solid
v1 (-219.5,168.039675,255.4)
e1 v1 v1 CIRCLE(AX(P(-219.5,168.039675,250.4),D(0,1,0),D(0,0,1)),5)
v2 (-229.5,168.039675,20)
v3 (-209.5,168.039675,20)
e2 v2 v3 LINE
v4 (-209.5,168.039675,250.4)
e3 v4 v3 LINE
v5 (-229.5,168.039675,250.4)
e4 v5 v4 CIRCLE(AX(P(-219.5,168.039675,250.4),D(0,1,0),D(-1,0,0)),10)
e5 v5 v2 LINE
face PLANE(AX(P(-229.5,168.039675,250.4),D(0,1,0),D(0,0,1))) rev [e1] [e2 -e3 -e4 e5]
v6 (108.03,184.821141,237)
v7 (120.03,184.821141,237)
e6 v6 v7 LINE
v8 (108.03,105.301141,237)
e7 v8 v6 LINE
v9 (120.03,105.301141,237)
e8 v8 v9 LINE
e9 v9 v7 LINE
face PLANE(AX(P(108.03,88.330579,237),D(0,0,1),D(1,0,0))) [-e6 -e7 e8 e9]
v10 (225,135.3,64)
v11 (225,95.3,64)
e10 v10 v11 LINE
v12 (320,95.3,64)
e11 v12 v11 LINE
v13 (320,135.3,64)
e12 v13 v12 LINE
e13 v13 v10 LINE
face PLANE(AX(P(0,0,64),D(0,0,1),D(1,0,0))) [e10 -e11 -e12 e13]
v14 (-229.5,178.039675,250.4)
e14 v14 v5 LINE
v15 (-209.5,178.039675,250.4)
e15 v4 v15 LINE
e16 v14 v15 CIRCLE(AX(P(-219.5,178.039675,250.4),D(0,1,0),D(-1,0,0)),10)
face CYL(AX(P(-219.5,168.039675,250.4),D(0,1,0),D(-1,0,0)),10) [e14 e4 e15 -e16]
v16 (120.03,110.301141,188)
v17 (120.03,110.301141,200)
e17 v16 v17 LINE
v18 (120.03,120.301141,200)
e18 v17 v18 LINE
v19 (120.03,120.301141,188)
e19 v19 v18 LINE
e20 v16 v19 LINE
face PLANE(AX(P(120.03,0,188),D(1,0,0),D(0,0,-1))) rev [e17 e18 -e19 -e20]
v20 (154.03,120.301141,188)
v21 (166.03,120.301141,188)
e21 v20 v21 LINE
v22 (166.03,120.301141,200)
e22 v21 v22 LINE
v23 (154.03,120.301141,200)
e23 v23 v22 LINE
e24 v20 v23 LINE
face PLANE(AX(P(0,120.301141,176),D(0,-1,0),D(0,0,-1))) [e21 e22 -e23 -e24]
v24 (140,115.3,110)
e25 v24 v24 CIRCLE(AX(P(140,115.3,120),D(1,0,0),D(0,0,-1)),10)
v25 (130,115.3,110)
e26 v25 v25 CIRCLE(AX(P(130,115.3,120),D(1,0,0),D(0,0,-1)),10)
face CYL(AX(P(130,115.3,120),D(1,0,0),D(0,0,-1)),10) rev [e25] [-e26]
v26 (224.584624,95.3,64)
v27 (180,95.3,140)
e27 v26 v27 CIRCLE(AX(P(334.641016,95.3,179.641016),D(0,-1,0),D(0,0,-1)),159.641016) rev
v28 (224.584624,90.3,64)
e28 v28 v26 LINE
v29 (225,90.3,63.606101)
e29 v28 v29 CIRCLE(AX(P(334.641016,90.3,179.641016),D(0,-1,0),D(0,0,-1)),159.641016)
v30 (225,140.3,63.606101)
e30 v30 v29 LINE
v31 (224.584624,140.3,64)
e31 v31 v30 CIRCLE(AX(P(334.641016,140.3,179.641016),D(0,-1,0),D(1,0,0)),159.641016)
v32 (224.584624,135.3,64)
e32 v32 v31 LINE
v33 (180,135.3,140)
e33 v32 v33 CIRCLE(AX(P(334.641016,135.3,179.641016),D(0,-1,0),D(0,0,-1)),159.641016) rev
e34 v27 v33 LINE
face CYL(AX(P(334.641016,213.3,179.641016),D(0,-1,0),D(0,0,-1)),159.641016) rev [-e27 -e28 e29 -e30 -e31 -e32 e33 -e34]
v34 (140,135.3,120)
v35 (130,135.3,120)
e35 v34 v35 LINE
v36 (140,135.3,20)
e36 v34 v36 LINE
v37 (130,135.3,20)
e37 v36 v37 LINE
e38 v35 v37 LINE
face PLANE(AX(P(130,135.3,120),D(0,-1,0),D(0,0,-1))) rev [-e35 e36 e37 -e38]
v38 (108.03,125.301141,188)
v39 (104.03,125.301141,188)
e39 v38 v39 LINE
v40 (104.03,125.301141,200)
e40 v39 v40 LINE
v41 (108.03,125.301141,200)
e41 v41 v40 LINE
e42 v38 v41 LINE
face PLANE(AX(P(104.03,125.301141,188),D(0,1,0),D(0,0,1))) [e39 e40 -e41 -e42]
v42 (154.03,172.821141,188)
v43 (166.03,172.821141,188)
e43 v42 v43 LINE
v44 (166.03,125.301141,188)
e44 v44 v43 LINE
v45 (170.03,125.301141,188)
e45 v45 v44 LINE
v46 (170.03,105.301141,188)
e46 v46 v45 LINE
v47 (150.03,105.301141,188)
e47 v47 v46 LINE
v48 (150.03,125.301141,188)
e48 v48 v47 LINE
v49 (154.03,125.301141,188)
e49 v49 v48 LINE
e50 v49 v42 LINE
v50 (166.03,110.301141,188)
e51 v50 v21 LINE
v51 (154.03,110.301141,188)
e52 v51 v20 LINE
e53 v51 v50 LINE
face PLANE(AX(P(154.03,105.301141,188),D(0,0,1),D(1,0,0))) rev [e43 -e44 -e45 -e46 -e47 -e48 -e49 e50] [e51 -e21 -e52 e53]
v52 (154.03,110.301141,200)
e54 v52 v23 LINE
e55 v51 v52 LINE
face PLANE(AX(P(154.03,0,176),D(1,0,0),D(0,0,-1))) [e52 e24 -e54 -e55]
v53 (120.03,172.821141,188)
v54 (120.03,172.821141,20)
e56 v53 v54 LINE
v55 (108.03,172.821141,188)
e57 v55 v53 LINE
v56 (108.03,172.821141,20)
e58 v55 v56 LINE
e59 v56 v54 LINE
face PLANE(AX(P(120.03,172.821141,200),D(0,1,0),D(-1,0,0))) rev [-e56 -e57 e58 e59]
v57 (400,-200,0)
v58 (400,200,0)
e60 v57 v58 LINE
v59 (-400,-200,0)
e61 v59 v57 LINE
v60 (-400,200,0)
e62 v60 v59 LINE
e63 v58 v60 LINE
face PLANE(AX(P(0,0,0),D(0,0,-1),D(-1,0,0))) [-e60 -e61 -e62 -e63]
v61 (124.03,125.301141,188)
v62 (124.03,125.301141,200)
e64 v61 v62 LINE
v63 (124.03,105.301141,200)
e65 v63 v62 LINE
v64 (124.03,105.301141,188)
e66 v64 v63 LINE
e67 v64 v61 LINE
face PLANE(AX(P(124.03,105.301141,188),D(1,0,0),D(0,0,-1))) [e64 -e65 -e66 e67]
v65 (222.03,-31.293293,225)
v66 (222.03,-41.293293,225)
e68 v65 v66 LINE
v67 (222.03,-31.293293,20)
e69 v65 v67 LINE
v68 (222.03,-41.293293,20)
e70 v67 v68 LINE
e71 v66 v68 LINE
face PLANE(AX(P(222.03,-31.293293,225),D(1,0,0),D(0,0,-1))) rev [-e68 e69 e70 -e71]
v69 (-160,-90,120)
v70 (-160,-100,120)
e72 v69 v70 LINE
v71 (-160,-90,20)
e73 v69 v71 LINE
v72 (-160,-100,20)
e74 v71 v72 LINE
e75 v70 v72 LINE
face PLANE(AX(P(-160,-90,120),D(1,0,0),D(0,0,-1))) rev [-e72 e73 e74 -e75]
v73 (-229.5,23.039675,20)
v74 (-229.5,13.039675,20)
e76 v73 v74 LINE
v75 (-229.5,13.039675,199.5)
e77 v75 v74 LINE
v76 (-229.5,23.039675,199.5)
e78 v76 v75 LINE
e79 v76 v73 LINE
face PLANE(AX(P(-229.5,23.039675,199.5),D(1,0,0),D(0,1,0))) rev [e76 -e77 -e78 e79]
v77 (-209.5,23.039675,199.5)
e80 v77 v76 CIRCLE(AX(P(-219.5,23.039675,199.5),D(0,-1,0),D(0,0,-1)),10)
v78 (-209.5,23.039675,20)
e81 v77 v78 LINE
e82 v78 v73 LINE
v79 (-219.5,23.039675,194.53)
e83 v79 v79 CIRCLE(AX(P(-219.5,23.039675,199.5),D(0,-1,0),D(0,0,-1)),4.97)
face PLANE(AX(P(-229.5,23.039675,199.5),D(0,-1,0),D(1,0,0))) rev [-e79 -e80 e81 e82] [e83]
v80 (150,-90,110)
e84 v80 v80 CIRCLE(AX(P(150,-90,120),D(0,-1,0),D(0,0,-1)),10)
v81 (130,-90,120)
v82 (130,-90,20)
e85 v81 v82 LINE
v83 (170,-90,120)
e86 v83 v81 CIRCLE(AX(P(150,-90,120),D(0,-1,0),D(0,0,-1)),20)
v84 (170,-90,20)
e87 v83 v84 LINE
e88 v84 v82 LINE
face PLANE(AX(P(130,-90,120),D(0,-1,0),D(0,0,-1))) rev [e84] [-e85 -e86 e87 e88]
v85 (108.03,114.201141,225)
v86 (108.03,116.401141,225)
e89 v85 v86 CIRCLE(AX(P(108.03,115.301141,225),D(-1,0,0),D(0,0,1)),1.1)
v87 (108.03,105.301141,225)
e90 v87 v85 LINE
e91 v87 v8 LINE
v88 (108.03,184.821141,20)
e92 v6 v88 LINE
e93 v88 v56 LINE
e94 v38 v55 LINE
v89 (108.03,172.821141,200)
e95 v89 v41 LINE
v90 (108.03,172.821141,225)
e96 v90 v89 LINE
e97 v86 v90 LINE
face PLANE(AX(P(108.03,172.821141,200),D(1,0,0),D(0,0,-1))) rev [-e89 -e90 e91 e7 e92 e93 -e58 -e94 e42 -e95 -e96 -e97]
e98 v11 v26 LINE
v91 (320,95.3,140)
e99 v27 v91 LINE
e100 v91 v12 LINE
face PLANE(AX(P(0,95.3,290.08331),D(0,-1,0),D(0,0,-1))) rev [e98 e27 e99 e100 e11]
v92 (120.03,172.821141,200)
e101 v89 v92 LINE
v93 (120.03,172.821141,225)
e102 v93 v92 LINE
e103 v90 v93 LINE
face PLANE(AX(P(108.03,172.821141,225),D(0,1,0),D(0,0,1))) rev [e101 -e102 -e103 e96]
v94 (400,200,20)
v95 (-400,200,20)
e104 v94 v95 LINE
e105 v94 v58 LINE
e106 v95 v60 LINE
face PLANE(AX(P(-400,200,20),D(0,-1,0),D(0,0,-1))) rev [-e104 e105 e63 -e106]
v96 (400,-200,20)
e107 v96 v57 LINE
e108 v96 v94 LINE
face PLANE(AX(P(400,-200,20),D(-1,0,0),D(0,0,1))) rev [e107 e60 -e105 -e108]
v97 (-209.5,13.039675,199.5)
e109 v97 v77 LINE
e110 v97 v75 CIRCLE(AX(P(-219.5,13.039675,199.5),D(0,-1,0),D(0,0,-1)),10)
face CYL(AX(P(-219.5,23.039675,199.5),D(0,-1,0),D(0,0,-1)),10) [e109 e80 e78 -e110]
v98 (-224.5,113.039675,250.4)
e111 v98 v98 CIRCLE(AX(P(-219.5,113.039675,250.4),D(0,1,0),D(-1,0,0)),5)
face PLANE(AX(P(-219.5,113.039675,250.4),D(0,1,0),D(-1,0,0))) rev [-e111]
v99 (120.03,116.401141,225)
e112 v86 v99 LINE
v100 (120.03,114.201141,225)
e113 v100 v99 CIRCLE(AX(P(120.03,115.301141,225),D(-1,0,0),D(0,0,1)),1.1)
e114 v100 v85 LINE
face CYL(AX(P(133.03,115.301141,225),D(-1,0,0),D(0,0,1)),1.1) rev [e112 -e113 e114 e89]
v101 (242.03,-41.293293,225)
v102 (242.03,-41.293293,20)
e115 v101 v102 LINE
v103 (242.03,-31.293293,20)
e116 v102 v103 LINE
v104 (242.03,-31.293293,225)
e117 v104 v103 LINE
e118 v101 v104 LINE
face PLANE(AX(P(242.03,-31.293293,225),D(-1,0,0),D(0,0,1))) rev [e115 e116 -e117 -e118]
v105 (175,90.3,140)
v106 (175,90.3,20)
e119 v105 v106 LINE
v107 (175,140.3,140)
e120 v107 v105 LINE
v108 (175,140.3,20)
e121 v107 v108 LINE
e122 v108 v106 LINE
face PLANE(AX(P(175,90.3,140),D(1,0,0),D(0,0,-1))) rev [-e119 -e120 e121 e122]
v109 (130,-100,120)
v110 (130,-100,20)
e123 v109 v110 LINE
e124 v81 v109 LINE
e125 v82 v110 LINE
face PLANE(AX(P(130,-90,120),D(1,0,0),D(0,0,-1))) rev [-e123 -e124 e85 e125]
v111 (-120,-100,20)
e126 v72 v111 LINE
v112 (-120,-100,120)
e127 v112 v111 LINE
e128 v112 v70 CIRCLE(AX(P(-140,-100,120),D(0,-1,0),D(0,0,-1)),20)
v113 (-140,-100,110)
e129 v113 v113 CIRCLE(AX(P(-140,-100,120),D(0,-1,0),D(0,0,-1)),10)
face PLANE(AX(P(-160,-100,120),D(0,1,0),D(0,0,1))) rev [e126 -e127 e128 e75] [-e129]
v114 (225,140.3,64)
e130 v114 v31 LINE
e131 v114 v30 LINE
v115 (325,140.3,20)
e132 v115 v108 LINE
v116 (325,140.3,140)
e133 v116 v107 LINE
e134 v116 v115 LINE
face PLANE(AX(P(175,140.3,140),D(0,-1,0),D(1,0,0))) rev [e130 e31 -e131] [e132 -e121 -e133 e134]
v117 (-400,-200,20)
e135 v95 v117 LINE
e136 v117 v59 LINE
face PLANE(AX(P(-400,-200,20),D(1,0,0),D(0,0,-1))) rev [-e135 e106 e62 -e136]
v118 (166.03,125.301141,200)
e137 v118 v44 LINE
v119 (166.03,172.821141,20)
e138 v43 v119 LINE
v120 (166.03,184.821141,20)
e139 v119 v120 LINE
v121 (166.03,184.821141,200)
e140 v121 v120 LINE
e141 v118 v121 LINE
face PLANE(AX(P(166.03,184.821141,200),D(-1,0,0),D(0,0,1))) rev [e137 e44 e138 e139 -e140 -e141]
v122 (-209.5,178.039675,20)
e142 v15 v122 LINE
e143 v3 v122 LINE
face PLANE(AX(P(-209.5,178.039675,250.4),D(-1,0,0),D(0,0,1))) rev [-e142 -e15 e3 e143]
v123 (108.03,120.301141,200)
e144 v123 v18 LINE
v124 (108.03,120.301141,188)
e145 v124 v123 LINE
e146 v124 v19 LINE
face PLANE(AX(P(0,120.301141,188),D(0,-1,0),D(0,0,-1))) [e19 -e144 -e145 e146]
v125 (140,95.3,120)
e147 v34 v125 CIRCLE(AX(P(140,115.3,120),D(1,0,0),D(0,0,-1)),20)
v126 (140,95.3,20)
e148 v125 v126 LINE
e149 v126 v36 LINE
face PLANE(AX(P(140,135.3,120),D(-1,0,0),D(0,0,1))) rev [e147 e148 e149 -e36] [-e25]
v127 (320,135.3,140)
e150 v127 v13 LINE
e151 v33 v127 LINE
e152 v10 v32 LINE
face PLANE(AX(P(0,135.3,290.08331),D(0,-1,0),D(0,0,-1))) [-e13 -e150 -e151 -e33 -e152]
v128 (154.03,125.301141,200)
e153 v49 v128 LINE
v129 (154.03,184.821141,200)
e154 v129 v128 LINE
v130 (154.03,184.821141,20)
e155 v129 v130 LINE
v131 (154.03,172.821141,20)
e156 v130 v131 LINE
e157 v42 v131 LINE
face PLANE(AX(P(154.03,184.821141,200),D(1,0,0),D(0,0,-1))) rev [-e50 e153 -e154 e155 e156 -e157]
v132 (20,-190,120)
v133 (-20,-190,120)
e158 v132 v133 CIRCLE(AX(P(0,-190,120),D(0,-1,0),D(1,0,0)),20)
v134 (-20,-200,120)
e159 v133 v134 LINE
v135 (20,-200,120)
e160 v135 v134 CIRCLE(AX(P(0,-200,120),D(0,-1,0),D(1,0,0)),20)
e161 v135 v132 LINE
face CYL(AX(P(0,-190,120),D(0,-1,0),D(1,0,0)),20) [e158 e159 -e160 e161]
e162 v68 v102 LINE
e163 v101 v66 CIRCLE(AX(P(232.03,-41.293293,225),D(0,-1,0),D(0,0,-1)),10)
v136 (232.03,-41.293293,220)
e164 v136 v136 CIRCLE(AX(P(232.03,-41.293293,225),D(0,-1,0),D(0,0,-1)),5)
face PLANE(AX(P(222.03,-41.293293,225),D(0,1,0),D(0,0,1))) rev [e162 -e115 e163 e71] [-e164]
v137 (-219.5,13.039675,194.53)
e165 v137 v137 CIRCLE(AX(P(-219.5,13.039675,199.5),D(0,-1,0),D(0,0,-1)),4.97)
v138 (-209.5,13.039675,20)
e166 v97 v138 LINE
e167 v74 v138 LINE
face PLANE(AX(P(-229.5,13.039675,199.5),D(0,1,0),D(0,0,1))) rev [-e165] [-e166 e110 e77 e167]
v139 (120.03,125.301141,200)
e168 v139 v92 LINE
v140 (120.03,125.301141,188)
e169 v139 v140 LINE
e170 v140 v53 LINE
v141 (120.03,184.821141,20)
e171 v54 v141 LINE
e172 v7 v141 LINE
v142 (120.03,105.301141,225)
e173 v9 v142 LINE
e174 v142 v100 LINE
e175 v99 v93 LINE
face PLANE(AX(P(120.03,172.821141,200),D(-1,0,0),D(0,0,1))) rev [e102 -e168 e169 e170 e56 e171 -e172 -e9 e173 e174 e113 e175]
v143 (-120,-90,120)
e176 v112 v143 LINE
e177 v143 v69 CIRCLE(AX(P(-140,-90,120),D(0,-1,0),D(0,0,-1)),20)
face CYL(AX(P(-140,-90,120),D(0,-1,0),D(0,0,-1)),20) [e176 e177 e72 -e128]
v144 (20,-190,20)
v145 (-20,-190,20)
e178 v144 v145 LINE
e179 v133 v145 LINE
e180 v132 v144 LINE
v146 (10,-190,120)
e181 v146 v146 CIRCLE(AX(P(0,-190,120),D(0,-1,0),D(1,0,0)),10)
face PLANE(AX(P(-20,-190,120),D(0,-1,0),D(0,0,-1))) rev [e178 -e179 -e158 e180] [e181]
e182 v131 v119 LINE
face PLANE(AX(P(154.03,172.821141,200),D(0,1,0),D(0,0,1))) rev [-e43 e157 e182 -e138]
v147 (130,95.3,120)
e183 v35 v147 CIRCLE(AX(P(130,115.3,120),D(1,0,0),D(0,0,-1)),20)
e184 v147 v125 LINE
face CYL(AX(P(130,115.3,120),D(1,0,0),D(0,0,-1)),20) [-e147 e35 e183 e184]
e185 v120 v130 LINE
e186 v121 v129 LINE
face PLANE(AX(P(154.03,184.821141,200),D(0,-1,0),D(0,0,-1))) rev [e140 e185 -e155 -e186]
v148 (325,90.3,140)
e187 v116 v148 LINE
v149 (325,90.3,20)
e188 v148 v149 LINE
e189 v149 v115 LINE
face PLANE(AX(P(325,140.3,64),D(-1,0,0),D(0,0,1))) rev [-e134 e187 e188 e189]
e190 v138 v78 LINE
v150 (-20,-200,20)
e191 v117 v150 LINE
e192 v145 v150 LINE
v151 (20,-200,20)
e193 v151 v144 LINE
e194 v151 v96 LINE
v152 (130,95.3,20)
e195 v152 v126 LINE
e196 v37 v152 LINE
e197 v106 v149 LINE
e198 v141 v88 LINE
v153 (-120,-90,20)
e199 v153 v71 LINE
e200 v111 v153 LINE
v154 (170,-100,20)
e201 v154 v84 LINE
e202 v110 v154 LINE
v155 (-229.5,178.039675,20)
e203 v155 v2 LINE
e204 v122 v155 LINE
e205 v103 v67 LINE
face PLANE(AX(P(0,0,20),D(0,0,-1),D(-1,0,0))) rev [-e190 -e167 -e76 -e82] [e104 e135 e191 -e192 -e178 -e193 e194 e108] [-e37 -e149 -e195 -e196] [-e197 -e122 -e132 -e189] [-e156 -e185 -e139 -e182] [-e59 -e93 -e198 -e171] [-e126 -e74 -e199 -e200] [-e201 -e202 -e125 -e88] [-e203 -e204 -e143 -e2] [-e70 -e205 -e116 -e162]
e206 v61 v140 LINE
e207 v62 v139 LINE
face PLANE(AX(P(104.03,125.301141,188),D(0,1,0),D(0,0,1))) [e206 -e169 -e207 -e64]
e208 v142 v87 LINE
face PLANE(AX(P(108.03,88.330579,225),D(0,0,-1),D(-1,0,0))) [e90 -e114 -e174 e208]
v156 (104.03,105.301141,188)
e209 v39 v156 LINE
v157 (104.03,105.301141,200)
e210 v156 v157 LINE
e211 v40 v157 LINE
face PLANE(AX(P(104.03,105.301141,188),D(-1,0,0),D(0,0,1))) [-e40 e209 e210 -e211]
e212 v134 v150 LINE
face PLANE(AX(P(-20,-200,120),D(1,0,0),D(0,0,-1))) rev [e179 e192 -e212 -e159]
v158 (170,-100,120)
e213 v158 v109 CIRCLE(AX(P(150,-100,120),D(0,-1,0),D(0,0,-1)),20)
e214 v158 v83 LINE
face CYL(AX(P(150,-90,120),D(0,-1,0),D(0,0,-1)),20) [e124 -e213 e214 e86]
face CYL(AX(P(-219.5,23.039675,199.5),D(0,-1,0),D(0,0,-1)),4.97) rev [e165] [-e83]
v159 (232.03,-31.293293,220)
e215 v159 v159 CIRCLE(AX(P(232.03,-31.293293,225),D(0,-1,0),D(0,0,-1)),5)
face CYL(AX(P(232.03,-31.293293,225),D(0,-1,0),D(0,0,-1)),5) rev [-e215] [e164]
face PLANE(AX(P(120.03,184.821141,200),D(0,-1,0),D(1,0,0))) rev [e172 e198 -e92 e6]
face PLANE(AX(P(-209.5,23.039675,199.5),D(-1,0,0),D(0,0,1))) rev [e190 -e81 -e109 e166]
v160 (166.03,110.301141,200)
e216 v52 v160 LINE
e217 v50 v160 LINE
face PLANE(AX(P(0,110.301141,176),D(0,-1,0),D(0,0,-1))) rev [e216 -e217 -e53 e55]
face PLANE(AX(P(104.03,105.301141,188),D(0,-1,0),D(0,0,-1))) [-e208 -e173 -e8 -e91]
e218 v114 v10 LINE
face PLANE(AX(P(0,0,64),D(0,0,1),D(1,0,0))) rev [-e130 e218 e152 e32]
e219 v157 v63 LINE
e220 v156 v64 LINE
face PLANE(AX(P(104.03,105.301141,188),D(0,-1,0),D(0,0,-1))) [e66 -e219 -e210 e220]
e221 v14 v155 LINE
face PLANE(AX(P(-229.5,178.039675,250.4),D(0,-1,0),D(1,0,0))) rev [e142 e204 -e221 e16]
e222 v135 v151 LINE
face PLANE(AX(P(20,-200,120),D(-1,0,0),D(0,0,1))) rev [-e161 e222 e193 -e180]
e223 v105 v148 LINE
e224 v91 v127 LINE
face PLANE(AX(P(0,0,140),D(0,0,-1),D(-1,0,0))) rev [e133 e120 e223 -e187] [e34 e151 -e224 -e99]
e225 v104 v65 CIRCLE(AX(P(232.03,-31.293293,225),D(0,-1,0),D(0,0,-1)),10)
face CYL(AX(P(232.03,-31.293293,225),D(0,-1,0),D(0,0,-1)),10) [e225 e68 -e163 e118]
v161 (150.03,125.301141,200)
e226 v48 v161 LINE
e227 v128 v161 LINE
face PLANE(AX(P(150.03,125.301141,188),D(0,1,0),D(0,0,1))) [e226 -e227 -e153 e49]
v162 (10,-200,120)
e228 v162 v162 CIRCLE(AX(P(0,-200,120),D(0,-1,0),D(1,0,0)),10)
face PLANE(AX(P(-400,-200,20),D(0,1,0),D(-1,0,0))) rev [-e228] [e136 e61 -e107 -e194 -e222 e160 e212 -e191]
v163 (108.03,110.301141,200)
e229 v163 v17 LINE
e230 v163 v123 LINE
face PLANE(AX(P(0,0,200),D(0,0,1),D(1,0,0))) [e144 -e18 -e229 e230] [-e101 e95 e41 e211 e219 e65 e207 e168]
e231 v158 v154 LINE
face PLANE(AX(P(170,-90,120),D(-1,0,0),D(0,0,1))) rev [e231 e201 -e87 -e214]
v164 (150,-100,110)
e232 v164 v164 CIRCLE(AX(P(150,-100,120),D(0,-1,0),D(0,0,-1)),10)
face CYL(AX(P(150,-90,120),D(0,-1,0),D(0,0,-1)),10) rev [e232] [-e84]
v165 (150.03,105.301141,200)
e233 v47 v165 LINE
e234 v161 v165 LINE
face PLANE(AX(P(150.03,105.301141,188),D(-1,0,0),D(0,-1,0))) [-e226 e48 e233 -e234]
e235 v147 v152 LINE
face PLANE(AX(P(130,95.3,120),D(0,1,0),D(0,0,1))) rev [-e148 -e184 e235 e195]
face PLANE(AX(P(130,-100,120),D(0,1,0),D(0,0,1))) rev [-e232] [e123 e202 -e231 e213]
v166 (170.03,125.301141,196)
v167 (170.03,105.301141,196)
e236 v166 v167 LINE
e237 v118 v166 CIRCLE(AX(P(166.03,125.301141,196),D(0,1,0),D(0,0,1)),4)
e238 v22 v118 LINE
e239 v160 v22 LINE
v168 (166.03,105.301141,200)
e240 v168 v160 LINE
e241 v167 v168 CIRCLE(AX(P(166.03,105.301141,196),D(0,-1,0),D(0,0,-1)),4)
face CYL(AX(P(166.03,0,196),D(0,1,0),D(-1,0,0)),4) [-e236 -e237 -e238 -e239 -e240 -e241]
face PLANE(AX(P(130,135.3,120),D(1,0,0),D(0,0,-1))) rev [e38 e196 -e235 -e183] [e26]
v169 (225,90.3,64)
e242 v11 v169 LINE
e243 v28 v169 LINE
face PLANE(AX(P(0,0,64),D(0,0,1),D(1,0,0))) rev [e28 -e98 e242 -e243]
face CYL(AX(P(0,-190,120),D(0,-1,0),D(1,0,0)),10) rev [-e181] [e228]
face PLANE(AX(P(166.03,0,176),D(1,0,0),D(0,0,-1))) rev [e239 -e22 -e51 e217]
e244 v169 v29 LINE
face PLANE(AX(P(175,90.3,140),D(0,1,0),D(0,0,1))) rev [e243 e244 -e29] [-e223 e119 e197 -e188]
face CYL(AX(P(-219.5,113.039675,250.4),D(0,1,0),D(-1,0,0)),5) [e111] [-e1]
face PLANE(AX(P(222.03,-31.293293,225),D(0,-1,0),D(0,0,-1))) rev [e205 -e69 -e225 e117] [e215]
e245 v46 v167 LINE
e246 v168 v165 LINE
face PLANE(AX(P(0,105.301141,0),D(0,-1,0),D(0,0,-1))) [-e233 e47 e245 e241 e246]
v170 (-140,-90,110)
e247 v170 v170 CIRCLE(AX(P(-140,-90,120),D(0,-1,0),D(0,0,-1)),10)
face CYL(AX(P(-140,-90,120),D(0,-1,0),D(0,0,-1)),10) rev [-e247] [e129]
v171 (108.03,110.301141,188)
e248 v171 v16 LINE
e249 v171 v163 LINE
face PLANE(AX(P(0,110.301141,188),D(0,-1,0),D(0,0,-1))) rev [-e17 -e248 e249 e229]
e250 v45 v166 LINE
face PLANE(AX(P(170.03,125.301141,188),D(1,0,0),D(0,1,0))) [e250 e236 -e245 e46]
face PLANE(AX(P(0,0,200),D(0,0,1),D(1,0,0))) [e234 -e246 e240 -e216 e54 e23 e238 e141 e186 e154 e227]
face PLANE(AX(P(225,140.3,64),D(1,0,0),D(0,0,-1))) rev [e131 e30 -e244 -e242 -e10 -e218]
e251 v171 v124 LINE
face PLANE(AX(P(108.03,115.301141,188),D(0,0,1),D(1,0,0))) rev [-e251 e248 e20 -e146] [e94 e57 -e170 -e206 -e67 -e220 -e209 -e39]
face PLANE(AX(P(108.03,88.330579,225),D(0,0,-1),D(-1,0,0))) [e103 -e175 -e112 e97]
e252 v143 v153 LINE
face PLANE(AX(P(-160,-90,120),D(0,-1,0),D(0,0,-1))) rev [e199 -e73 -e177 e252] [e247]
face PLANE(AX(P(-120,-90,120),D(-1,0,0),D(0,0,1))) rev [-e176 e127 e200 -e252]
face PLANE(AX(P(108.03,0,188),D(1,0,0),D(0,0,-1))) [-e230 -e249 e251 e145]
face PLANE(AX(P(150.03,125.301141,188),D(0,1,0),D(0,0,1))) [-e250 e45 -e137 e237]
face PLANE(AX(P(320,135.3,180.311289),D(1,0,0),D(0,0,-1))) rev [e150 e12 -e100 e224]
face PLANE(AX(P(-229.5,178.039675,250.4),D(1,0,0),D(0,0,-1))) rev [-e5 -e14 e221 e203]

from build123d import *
from build123d.topology import SkipClean

# Parameters (mm, degrees)
SKETCH_1_W           = 800
SKETCH_1_H           = 400
EXTRUDE_1_DEPTH      = 20
SKETCH_2_W           = 40
SKETCH_2_H           = 10
EXTRUDE_2_DEPTH      = 100
SKETCH_3_R           = 20
EXTRUDE_3_DEPTH      = 10
SKETCH_4_R           = 10
CUT_EXTRUDE_1_DEPTH  = 10
SKETCH_5_W           = 40
SKETCH_5_H           = 10
EXTRUDE_4_DEPTH      = 100
SKETCH_6_R           = 20
SKETCH_6_R_2         = 10
EXTRUDE_5_DEPTH      = 10
SKETCH_8_R           = 10
CUT_EXTRUDE_2_DEPTH  = 10
SKETCH_9_W           = 10
SKETCH_9_H           = 40
EXTRUDE_6_DEPTH      = 100
SKETCH_10_R          = 20
EXTRUDE_7_DEPTH      = 10
SKETCH_11_R          = 10
CUT_EXTRUDE_3_DEPTH  = 10
SKETCH_12_W          = 40
SKETCH_12_H          = 10
EXTRUDE_8_DEPTH      = 100
SKETCH_13_R          = 20
EXTRUDE_9_DEPTH      = 10
SKETCH_14_R          = 10
CUT_EXTRUDE_4_DEPTH  = 10
SKETCH_15_W          = 20
SKETCH_15_H          = 10
EXTRUDE_10_DEPTH     = 179.5
SKETCH_16_R          = 10
EXTRUDE_11_DEPTH     = 10
SKETCH_17_R          = 4.97
CUT_EXTRUDE_5_DEPTH  = 10
SKETCH_18_W          = 12
SKETCH_18_H          = 12
EXTRUDE_12_DEPTH     = 180
SKETCH_19_W          = 12
SKETCH_19_H          = 12
EXTRUDE_13_DEPTH     = 57.52
SKETCH_20_W          = 20
SKETCH_20_H          = 20
EXTRUDE_14_DEPTH     = 12
SKETCH_21_W          = 6
SKETCH_21_H          = 5
CUT_EXTRUDE_6_DEPTH  = 12
SKETCH_23_W          = 12
SKETCH_23_H          = 12
EXTRUDE_15_DEPTH     = 180
SKETCH_24_W          = 12
SKETCH_24_H          = 12
EXTRUDE_16_DEPTH     = 67.52
EXTRUDE_17_DEPTH     = 12
SKETCH_26_W          = 6
SKETCH_26_H          = 5
CUT_EXTRUDE_7_DEPTH  = 24
SKETCH_27_W          = 12
SKETCH_27_H          = 12
EXTRUDE_18_DEPTH     = 25
SKETCH_28_W          = 12
SKETCH_28_H          = 12
EXTRUDE_19_DEPTH     = 79.52
SKETCH_29_R          = 1.1
CUT_EXTRUDE_8_DEPTH  = 25
SKETCH_30_W          = 20
SKETCH_30_H          = 10
EXTRUDE_20_DEPTH     = 205
SKETCH_31_R          = 10
EXTRUDE_21_DEPTH     = 10
SKETCH_32_R          = 5
CUT_EXTRUDE_9_DEPTH  = 10
FILLET_1_R           = 4
SKETCH_34_W          = 50
SKETCH_34_H          = 50
SKETCH_34_W_2        = 40
SKETCH_34_H_2        = 40
EXTRUDE_22_DEPTH     = 120
CUT_EXTRUDE_11_DEPTH = 123
SKETCH_36_W          = 100
SKETCH_36_H          = 50
EXTRUDE_23_DEPTH     = 44
SKETCH_38_W          = 40
SKETCH_38_H          = 40
EXTRUDE_24_DEPTH     = 120
CUT_EXTRUDE_12_DEPTH = 138
SKETCH_40_W          = 50
SKETCH_40_H          = 5
EXTRUDE_26_DEPTH     = 76
SKETCH_41_W          = 5
SKETCH_41_H          = 40
EXTRUDE_27_DEPTH     = 76
SKETCH_42_W          = 20
SKETCH_42_H          = 10
EXTRUDE_28_DEPTH     = 230.4
SKETCH_43_R          = 10
EXTRUDE_29_DEPTH     = 10
SKETCH_44_R          = 5
EXTRUDE_30_DEPTH     = 65


with BuildPart() as part:
    # 草图1 → 凸台-拉伸1 (new body)
    with BuildSketch(Plane.XY):
        Rectangle(SKETCH_1_W, SKETCH_1_H)
    extrude(amount=EXTRUDE_1_DEPTH)

    # 草图2 → 凸台-拉伸2 (add)
    with BuildSketch(Plane.XY.offset(20)):
        with Locations((0, -195)):
            Rectangle(SKETCH_2_W, SKETCH_2_H)
    extrude(amount=EXTRUDE_2_DEPTH)

    # 草图3 → 凸台-拉伸3 (add)
    with BuildSketch(Plane.XZ.offset(200)):
        with Locations((0, 120)):
            Circle(SKETCH_3_R)
    extrude(amount=-EXTRUDE_3_DEPTH)

    # 草图4 → 切除-拉伸1 (cut)
    with BuildSketch(Plane.XZ.offset(200)):
        with Locations((0, 120)):
            Circle(SKETCH_4_R)
    extrude(amount=-CUT_EXTRUDE_1_DEPTH, mode=Mode.SUBTRACT)

    # 草图5 → 凸台-拉伸4 (add)
    with BuildSketch(Plane.XY.offset(20)):
        with Locations((150, -95)):
            Rectangle(SKETCH_5_W, SKETCH_5_H)
    extrude(amount=EXTRUDE_4_DEPTH)

    # 草图6 → 凸台-拉伸5 (add)
    with BuildSketch(Plane.XZ.offset(100)):
        with Locations((150, 120)):
            Circle(SKETCH_6_R)
        with Locations((150, 120)):
            Circle(SKETCH_6_R_2, mode=Mode.SUBTRACT)
    extrude(amount=-EXTRUDE_5_DEPTH)

    # 草图8 → 切除-拉伸2 (cut)
    with BuildSketch(Plane.XZ.offset(100)):
        with Locations(Location((150, 120, 0), (0, 0, 270))):
            Circle(SKETCH_8_R)
    extrude(amount=-CUT_EXTRUDE_2_DEPTH, mode=Mode.SUBTRACT)

    # 草图9 → 凸台-拉伸6 (add)
    with BuildSketch(Plane.XY.offset(20)):
        with Locations((135, 115.3)):
            Rectangle(SKETCH_9_W, SKETCH_9_H)
    extrude(amount=EXTRUDE_6_DEPTH)

    # 草图10 → 凸台-拉伸7 (add)
    with BuildSketch(Plane(origin=(140, 0, 0), x_dir=(0, 0, -1), z_dir=(1, 0, 0))):
        with Locations((-120, 115.3)):
            Circle(SKETCH_10_R)
    extrude(amount=-EXTRUDE_7_DEPTH)

    # 草图11 → 切除-拉伸3 (cut)
    with BuildSketch(Plane(origin=(140, 0, 0), x_dir=(0, 0, -1), z_dir=(1, 0, 0))):
        with Locations((-120, 115.3)):
            Circle(SKETCH_11_R)
    extrude(amount=-CUT_EXTRUDE_3_DEPTH, mode=Mode.SUBTRACT)

    # 草图12 → 凸台-拉伸8 (add)
    with BuildSketch(Plane.XY.offset(20)):
        with Locations((-140, -95)):
            Rectangle(SKETCH_12_W, SKETCH_12_H)
    extrude(amount=EXTRUDE_8_DEPTH)

    # 草图13 → 凸台-拉伸9 (add)
    with BuildSketch(Plane.XZ.offset(100)):
        with Locations((-140, 120)):
            Circle(SKETCH_13_R)
    extrude(amount=-EXTRUDE_9_DEPTH)

    # 草图14 → 切除-拉伸4 (cut)
    with BuildSketch(Plane.XZ.offset(100)):
        with Locations(Location((-140, 120, 0), (0, 0, 270))):
            Circle(SKETCH_14_R)
    extrude(amount=-CUT_EXTRUDE_4_DEPTH, mode=Mode.SUBTRACT)

    # 草图15 → 凸台-拉伸10 (add)
    with BuildSketch(Plane.XY.offset(20)):
        with Locations((-219.5, 18.039674664)):
            Rectangle(SKETCH_15_W, SKETCH_15_H)
    extrude(amount=EXTRUDE_10_DEPTH)

    # 草图16 → 凸台-拉伸11 (add)
    with BuildSketch(Plane.XZ.offset(-13.039674664)):
        with Locations((-219.5, 199.5)):
            Circle(SKETCH_16_R)
    extrude(amount=-EXTRUDE_11_DEPTH)

    # 草图17 → 切除-拉伸5 (cut)
    with BuildSketch(Plane.XZ.offset(-13.039674664)):
        with Locations(Location((-219.5, 199.5, 0), (0, 0, 270))):
            Circle(SKETCH_17_R)
    extrude(amount=-CUT_EXTRUDE_5_DEPTH, mode=Mode.SUBTRACT)

    # 草图18 → 凸台-拉伸12 (add)
    with BuildSketch(Plane.XY.offset(20)):
        with Locations((114.03, 178.821141396)):
            Rectangle(SKETCH_18_W, SKETCH_18_H)
    extrude(amount=EXTRUDE_12_DEPTH)

    # 草图19 → 凸台-拉伸13 (add)
    with BuildSketch(Plane.XZ.offset(-172.821141396)):
        with Locations((114.03, 194)):
            Rectangle(SKETCH_19_W, SKETCH_19_H)
    extrude(amount=EXTRUDE_13_DEPTH)

    # 草图20 → 凸台-拉伸14 (add)
    with BuildSketch(Plane.XY.offset(200)):
        with Locations((114.03, 115.301141396)):
            Rectangle(SKETCH_20_W, SKETCH_20_H)
    extrude(amount=-EXTRUDE_14_DEPTH)

    # 草图21 → 切除-拉伸6 (cut)
    with BuildSketch(Plane.XY.offset(200)):
        with Locations((111.03, 112.801141396)):
            Rectangle(SKETCH_21_W, SKETCH_21_H)
        Polygon((114.03, 115.301141396), (120.03, 115.301141396), (120.03, 120.301141396), (108.03, 120.301141396), (108.03, 115.301141396), align=None)
        with Locations((117.03, 112.801141396)):
            Rectangle(SKETCH_21_W, SKETCH_21_H)
    extrude(amount=-CUT_EXTRUDE_6_DEPTH, mode=Mode.SUBTRACT)

    # 草图23 → 凸台-拉伸15 (add)
    with BuildSketch(Plane.XY.offset(20)):
        with Locations((160.03, 178.821141396)):
            Rectangle(SKETCH_23_W, SKETCH_23_H)
    extrude(amount=EXTRUDE_15_DEPTH)

    # 草图24 → 凸台-拉伸16 (add)
    with BuildSketch(Plane.XZ.offset(-172.821141396)):
        with Locations((160.03, 194)):
            Rectangle(SKETCH_24_W, SKETCH_24_H)
    extrude(amount=EXTRUDE_16_DEPTH)

    # 草图25 → 凸台-拉伸17 (add)
    with BuildSketch(Plane.XY.offset(200)):
        Polygon((160.03, 105.301141396), (150.03, 105.301141396), (150.03, 125.301141396), (170.03, 125.301141396), (170.03, 105.301141396), align=None)
    extrude(amount=-EXTRUDE_17_DEPTH)

    # 草图26 → 切除-拉伸7 (cut)
    with BuildSketch(Plane.XY.offset(200)):
        Polygon((160.03, 115.301141396), (166.03, 115.301141396), (166.03, 120.301141396), (154.03, 120.301141396), (154.03, 115.301141396), align=None)
        with Locations((157.03, 112.801141396)):
            Rectangle(SKETCH_26_W, SKETCH_26_H)
        with Locations((163.03, 112.801141396)):
            Rectangle(SKETCH_26_W, SKETCH_26_H)
    extrude(amount=-CUT_EXTRUDE_7_DEPTH, mode=Mode.SUBTRACT)

    # 草图27 → 凸台-拉伸18 (add)
    with BuildSketch(Plane.XY.offset(200)):
        with Locations((114.03, 178.821141396)):
            Rectangle(SKETCH_27_W, SKETCH_27_H)
    extrude(amount=EXTRUDE_18_DEPTH)

    # 草图28 → 凸台-拉伸19 (add)
    with BuildSketch(Plane(origin=(0, 184.821141396, 0), x_dir=(1, 0, 0), z_dir=(0, 1, 0))):
        with Locations((114.03, -231)):
            Rectangle(SKETCH_28_W, SKETCH_28_H)
    extrude(amount=-EXTRUDE_19_DEPTH)

    # 草图29 → 切除-拉伸8 (cut)
    with BuildSketch(Plane.ZY.offset(-108.03)):
        with Locations((225, 115.301141396)):
            Circle(SKETCH_29_R)
    extrude(amount=-CUT_EXTRUDE_8_DEPTH, mode=Mode.SUBTRACT)

    # 草图30 → 凸台-拉伸20 (add)
    with BuildSketch(Plane.XY.offset(20)):
        with Locations((232.03, -36.293292708)):
            Rectangle(SKETCH_30_W, SKETCH_30_H)
    extrude(amount=EXTRUDE_20_DEPTH)

    # 草图31 → 凸台-拉伸21 (add)
    with BuildSketch(Plane.XZ.offset(41.293292708)):
        with Locations((232.03, 225)):
            Circle(SKETCH_31_R)
    extrude(amount=-EXTRUDE_21_DEPTH)

    # 草图32 → 切除-拉伸9 (cut)
    with BuildSketch(Plane.XZ.offset(41.293292708)):
        with Locations(Location((232.03, 225, 0), (0, 0, 270))):
            Circle(SKETCH_32_R)
    extrude(amount=-CUT_EXTRUDE_9_DEPTH, mode=Mode.SUBTRACT)

    # 圆角1
    fillet_1_edges = [part.edges().sort_by_distance(p)[0] for p in [
        (170.03, 115.301141396, 200),
    ]]
    fillet(fillet_1_edges, radius=FILLET_1_R - 0.0001)  # a hair under: the kernel refuses the full size

    # 草图34 → 凸台-拉伸22 (add)
    with BuildSketch(Plane.XY.offset(20)):
        with Locations((200, 115.3)):
            Rectangle(SKETCH_34_W, SKETCH_34_H)
        with Locations((200, 115.3)):
            Rectangle(SKETCH_34_W_2, SKETCH_34_H_2, mode=Mode.SUBTRACT)
    extrude(amount=EXTRUDE_22_DEPTH)

    # 草图35 → 切除-拉伸11 (cut)
    with BuildSketch(Plane.XZ.offset(-90.3)):
        with BuildLine():
            ThreePointArc((225, 63.606100651), (397.8155791, 33.031914681), (494.282032303, 179.641016151))
            ThreePointArc((494.282032303, 179.641016151), (314.663465241, 338.027099812), (180, 140))
            Line((180, 140), (225, 140))
            Line((225, 140), (225, 63.606100651))
        make_face()
        with BuildLine():
            Line((225, 140), (180, 140))
            ThreePointArc((180, 140), (197.090097892, 98.616335196), (225, 63.606100651))
            Line((225, 63.606100651), (225, 140))
        make_face()
    extrude(amount=-CUT_EXTRUDE_11_DEPTH, mode=Mode.SUBTRACT)

    # 草图36 → 凸台-拉伸23 (add)
    with BuildSketch(Plane.XY.offset(20)):
        with Locations((275, 115.3)):
            Rectangle(SKETCH_36_W, SKETCH_36_H)
    extrude(amount=EXTRUDE_23_DEPTH)

    # 草图38 → 凸台-拉伸24 (add)
    with BuildSketch(Plane.XY.offset(20)):
        with Locations((200, 115.3)):
            Rectangle(SKETCH_38_W, SKETCH_38_H)
    extrude(amount=EXTRUDE_24_DEPTH)

    # 草图39 → 切除-拉伸12 (cut)
    with SkipClean():  # the faces are left unmerged after this step: merging them gives an invalid solid
        with BuildSketch(Plane.XZ.offset(-95.3)):
            with BuildLine():
                Line((220, 140), (220, 68.543349868))
                ThreePointArc((220, 68.543349868), (195.340203367, 101.66321421), (180, 140))
                Line((180, 140), (220, 140))
            make_face()
        extrude(amount=-CUT_EXTRUDE_12_DEPTH, mode=Mode.SUBTRACT)

    # 草图40 → 凸台-拉伸26 (add)
    with SkipClean():  # the faces are left unmerged after this step: merging them gives an invalid solid
        with BuildSketch(Plane.XY.offset(64)):
            Polygon((325, 135.3), (325, 140.3), (320, 140.3), (225, 140.3), (225, 135.3), align=None)
            Polygon((325, 90.3), (325, 95.3), (225, 95.3), (225, 90.3), (320, 90.3), align=None)
            with Locations((200, 92.8)):
                Rectangle(SKETCH_40_W, SKETCH_40_H)
            with Locations((200, 137.8)):
                Rectangle(SKETCH_40_W, SKETCH_40_H)
        extrude(amount=EXTRUDE_26_DEPTH)

    # 草图41 → 凸台-拉伸27 (add)
    with SkipClean():  # the faces are left unmerged after this step: merging them gives an invalid solid
        with BuildSketch(Plane.XY.offset(64)):
            with Locations((322.5, 115.3)):
                Rectangle(SKETCH_41_W, SKETCH_41_H)
        extrude(amount=EXTRUDE_27_DEPTH)

    # 草图42 → 凸台-拉伸28 (add)
    with SkipClean():  # the faces are left unmerged after this step: merging them gives an invalid solid
        with BuildSketch(Plane.XY.offset(20)):
            with Locations((-219.5, 173.039674664)):
                Rectangle(SKETCH_42_W, SKETCH_42_H)
        extrude(amount=EXTRUDE_28_DEPTH)

    # 草图43 → 凸台-拉伸29 (add)
    with SkipClean():  # the faces are left unmerged after this step: merging them gives an invalid solid
        with BuildSketch(Plane(origin=(0, 178.039674664, 0), x_dir=(1, 0, 0), z_dir=(0, 1, 0))):
            with Locations((-219.5, -250.4)):
                Circle(SKETCH_43_R)
        extrude(amount=-EXTRUDE_29_DEPTH)

    # 草图44 → 凸台-拉伸30 (add)
    with SkipClean():  # the faces are left unmerged after this step: merging them gives an invalid solid
        with BuildSketch(Plane(origin=(0, 178.039674664, 0), x_dir=(1, 0, 0), z_dir=(0, 1, 0))):
            with Locations(Location((-219.5, -250.4, 0), (0, 0, 180))):
                Circle(SKETCH_44_R)
        extrude(amount=-EXTRUDE_30_DEPTH)


solid = part.part
